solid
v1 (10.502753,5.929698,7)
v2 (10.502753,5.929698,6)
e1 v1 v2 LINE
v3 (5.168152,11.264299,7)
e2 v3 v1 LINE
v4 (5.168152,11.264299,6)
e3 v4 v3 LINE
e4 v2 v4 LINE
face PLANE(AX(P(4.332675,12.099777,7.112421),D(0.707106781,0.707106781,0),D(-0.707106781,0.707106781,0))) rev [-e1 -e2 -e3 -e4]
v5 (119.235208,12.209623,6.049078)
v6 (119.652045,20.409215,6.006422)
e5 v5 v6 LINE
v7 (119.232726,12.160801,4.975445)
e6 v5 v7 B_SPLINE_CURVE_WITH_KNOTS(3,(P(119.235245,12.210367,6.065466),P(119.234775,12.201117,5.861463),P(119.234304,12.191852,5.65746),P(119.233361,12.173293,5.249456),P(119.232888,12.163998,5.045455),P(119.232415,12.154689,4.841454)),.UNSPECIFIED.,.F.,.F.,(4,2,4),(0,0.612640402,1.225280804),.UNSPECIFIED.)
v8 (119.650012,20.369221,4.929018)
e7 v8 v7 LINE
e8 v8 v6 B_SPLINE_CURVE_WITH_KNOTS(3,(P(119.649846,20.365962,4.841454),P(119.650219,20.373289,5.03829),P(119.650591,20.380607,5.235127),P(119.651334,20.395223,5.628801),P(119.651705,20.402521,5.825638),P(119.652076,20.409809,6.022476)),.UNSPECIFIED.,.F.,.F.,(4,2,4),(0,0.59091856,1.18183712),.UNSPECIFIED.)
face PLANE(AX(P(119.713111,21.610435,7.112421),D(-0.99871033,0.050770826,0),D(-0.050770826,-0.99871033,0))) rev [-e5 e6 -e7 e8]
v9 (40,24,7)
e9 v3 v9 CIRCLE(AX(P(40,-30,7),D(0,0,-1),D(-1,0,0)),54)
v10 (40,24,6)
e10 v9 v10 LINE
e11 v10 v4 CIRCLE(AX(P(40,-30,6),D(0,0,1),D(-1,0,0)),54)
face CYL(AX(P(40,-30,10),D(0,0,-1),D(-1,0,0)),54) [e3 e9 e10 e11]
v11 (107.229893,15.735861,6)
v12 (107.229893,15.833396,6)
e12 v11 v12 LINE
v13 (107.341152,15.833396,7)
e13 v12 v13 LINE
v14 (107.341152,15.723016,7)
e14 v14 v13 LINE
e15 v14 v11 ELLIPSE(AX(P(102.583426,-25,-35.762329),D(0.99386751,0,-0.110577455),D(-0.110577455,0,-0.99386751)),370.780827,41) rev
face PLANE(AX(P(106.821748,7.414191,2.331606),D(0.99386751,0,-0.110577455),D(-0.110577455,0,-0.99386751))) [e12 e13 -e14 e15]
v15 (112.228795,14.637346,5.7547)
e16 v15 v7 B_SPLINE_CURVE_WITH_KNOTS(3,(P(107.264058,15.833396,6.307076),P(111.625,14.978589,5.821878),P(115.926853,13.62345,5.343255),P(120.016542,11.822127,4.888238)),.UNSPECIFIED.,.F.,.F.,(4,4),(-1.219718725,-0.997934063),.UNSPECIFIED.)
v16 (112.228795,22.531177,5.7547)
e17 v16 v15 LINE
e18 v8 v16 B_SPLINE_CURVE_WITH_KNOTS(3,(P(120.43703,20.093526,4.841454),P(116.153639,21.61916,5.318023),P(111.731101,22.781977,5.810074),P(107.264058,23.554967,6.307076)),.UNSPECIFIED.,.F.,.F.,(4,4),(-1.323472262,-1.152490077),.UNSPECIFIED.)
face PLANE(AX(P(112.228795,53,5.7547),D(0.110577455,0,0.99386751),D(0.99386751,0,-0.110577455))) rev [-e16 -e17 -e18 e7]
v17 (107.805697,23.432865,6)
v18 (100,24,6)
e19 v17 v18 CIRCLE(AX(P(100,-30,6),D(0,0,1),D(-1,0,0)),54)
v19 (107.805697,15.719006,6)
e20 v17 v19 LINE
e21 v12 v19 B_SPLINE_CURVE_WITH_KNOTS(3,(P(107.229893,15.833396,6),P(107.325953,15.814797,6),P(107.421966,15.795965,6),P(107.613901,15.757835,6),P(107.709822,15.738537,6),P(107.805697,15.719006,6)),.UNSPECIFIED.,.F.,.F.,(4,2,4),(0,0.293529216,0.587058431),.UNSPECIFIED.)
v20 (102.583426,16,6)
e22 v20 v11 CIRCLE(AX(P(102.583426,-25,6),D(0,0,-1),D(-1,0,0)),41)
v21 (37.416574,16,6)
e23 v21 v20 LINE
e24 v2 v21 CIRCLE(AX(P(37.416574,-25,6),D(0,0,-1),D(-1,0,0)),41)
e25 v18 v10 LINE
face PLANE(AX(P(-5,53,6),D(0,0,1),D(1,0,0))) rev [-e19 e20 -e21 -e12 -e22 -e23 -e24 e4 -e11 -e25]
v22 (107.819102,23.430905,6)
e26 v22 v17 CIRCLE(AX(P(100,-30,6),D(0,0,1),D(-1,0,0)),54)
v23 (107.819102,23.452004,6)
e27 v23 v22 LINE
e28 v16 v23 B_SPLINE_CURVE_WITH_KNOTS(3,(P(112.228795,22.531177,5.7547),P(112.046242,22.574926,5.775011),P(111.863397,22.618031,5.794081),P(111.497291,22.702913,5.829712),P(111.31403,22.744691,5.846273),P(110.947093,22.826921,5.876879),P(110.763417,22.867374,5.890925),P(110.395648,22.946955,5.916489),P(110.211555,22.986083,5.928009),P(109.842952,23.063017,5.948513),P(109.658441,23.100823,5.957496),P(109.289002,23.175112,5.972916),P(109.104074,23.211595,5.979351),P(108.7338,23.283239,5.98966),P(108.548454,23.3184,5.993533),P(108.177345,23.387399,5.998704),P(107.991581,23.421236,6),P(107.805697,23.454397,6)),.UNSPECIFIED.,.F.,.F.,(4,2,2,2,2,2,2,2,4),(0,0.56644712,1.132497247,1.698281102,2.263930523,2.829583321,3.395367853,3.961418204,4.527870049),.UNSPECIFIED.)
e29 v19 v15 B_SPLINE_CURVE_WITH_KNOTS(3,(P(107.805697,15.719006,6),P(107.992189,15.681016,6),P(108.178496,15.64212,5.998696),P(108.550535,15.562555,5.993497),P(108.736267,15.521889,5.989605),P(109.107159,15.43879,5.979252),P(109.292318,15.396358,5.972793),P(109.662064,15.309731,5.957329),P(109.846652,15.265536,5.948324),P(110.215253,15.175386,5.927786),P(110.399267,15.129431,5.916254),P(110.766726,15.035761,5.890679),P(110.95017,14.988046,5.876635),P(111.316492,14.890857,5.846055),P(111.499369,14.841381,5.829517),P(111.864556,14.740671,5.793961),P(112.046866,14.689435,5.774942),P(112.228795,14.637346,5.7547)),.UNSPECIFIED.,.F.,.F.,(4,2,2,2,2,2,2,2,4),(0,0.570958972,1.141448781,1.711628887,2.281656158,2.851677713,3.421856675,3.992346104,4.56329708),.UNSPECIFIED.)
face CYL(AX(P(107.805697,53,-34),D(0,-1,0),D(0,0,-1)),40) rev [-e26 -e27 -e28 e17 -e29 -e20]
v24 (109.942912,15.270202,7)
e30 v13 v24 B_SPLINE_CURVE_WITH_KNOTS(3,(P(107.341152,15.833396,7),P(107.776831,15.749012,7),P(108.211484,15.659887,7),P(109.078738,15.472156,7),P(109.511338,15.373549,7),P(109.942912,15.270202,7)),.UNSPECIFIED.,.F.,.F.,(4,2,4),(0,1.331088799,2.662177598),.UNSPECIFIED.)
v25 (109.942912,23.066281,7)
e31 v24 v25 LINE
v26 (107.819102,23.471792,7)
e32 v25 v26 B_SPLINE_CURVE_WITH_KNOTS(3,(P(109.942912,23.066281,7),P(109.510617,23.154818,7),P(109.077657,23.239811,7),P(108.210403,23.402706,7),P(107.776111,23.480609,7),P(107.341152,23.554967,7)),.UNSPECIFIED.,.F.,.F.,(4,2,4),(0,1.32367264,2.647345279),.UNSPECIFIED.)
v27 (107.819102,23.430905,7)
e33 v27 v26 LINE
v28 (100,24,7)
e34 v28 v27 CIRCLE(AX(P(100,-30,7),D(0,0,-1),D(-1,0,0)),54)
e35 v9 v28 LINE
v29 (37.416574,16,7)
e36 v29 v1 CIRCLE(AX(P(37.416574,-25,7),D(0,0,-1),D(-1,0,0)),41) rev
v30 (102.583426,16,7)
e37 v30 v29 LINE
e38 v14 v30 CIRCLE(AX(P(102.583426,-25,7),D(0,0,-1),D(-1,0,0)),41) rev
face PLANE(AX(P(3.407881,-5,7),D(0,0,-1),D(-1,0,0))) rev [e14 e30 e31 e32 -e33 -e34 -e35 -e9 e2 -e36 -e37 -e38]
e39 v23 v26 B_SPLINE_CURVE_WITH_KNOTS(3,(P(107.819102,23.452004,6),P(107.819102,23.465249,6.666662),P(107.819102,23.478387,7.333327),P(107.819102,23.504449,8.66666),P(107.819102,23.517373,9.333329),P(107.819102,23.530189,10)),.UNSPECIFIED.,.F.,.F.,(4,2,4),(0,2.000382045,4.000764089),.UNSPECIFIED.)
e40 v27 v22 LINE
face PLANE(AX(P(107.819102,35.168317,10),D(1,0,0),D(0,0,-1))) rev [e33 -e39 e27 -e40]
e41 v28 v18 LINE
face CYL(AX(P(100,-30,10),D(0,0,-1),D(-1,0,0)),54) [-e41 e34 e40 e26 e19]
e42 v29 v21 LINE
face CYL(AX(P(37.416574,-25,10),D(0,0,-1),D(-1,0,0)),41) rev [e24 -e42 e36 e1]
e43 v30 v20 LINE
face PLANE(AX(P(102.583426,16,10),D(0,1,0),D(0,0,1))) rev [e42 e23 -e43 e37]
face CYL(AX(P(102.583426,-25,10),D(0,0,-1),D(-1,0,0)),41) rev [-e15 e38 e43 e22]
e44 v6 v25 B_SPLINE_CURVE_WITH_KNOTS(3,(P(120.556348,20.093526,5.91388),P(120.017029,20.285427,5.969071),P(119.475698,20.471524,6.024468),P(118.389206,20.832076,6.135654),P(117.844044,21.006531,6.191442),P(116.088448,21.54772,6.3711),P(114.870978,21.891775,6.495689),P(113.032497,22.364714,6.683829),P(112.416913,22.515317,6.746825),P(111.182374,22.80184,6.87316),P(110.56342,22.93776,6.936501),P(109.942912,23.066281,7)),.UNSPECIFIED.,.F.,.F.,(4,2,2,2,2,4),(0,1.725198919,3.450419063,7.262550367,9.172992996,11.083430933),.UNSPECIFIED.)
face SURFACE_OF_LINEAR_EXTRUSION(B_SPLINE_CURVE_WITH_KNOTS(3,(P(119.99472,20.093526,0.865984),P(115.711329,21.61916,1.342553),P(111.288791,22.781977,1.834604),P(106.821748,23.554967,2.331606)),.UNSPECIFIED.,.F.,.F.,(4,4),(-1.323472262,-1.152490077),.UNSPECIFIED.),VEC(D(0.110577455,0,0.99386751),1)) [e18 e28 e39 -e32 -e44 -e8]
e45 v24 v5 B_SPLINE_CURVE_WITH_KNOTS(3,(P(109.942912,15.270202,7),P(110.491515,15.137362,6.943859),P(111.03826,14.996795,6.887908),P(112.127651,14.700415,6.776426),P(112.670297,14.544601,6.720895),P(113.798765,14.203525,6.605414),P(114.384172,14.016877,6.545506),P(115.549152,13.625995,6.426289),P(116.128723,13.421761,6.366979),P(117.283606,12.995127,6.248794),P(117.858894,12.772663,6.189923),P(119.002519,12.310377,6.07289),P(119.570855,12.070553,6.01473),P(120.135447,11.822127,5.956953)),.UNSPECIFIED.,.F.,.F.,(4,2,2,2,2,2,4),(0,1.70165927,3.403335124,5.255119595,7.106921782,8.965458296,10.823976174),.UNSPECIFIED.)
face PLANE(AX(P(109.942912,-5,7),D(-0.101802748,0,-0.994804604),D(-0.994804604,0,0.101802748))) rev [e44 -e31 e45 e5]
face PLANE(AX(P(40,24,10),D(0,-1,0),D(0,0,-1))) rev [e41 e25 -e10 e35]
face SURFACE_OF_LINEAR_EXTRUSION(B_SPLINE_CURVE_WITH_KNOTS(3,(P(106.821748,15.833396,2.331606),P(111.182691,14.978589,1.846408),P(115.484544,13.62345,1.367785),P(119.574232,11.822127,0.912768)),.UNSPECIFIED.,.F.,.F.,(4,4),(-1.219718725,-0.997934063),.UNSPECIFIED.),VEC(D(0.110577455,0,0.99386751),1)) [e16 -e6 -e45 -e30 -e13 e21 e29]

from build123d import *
from OCP.BRepAlgoAPI import BRepAlgoAPI_Cut
from OCP.TopTools import TopTools_ListOfShape

# Parameters (mm, degrees)
SKETCH10_R              = 1.5
BOSS_EXTRUDE2_DEPTH     = 18
CUT_EXTRUDE1_DEPTH      = 53
CUT_EXTRUDE1_DEPTH_BACK = 21
SKETCH12_R              = 101.363268326
CUT_EXTRUDE2_DEPTH      = 4
CUT_EXTRUDE3_DEPTH      = 4
CUT_EXTRUDE3_DEPTH_BACK = 4
CUT_EXTRUDE4_DEPTH      = 149.963082804
CUT_EXTRUDE4_DEPTH_BACK = 149.963082804
CUT_EXTRUDE5_DEPTH      = 123.927520285
CUT_EXTRUDE5_DEPTH_BACK = 123.927520285


with BuildPart() as part:
    # Sketch10 → Boss-Extrude2 (new body)
    with BuildSketch(Plane.XY):
        with BuildLine():
            Line((37.416573868, 15), (102.583426132, 15))
            ThreePointArc((102.583426132, 15), (121.439606964, 10.276684148), (135.842602904, -2.777777778))
            ThreePointArc((135.842602904, -2.777777778), (142.889960635, -4.080211701), (144, 3))
            ThreePointArc((144, 3), (124.596747752, 19.193495505), (100, 25))
            Line((100, 25), (40, 25))
            ThreePointArc((40, 25), (15.403252248, 19.193495505), (-4, 3))
            ThreePointArc((-4, 3), (-2.889960635, -4.080211701), (4.157397096, -2.777777778))
            ThreePointArc((4.157397096, -2.777777778), (18.560393036, 10.276684148), (37.416573868, 15))
        make_face()
        Circle(SKETCH10_R, mode=Mode.SUBTRACT)
        with Locations((140, 0)):
            Circle(SKETCH10_R, mode=Mode.SUBTRACT)
    extrude(amount=BOSS_EXTRUDE2_DEPTH)

    # Sketch12 → Cut-Extrude1 (cut, two sides: drawn at the far end of the back side and taken through both)
    with BuildSketch(Plane(origin=(0, 0, 0), x_dir=(1, 0, 0), z_dir=(0, 1, 0)).offset(-CUT_EXTRUDE1_DEPTH_BACK)):
        with Locations((76.008049748, -10.931288324)):
            Circle(SKETCH12_R)
        with BuildLine():
            Line((-5, -6), (-5, -14))
            Line((-5, -14), (107.805696866, -14))
            ThreePointArc((107.805696866, -14), (113.026744555, -14.342205545), (118.15845867, -15.362966948))
            Line((118.15845867, -15.362966948), (122.913338099, -16.637033052))
            ThreePointArc((122.913338099, -16.637033052), (128.045052215, -17.657794455), (133.266099903, -18))
            Line((133.266099903, -18), (145, -18))
            Line((145, -18), (145, -14))
            Line((145, -14), (130, -14))
            Line((130, -14), (126.989127027, -13.193239018))
            ThreePointArc((126.989127027, -13.193239018), (125.143296129, -10.589859532), (127.359731004, -8.293755679))
            Line((127.359731004, -8.293755679), (130, -8))
            Line((130, -8), (145, -8))
            Line((145, -8), (145, -4))
            Line((145, -4), (130.2183511, -4))
            ThreePointArc((130.2183511, -4), (128.003403615, -4.061371986), (125.795252917, -4.245299618))
            Line((125.795252917, -4.245299618), (112.228795048, -5.754700382))
            ThreePointArc((112.228795048, -5.754700382), (110.02064435, -5.938628014), (107.805696866, -6))
            Line((107.805696866, -6), (-5, -6))
        make_face(mode=Mode.SUBTRACT)
    extrude(amount=CUT_EXTRUDE1_DEPTH + CUT_EXTRUDE1_DEPTH_BACK, mode=Mode.SUBTRACT)


with BuildPart() as cut_extrude2_tool:
    # Sketch14 → Cut-Extrude2 (new body)
    with BuildSketch(Plane(origin=(0, 0, 6), x_dir=(-1, 0, 0), z_dir=(0, 0, -1))):
        with BuildLine():
            Line((-102.583426132, 16), (-37.416573868, 16))
            ThreePointArc((-37.416573868, 16), (-22.580527687, 13.221613437), (-9.75522645, 5.2630114))
            Line((-9.75522645, 5.2630114), (-4.407881121, 10.610356729))
            ThreePointArc((-4.407881121, 10.610356729), (-20.986311028, 20.541860192), (-40, 24))
            Line((-40, 24), (-100, 24))
            ThreePointArc((-100, 24), (-103.919892318, 23.857538416), (-107.819101893, 23.430905341))
            Line((-107.819101893, 23.430905341), (-107.819101893, 35.168317198))
            Line((-107.819101893, 35.168317198), (17.162371348, 35.168317198))
            Line((17.162371348, 35.168317198), (17.162371348, -18.766284645))
            Line((17.162371348, -18.766284645), (-107.819101893, -18.766284645))
            Line((-107.819101893, -18.766284645), (-107.819101893, 15.664329569))
            ThreePointArc((-107.819101893, 15.664329569), (-105.206638634, 15.915996336), (-102.583426132, 16))
        make_face()
    extrude(amount=-CUT_EXTRUDE2_DEPTH)


with BuildPart() as part_1:
    add(part.part)

    # Cut-Extrude2: cut by cut_extrude2_tool, with a tolerance
    cut_extrude2_stock = TopTools_ListOfShape()
    cut_extrude2_stock.Append(part_1.part.wrapped)
    cut_extrude2_tools = TopTools_ListOfShape()
    cut_extrude2_tools.Append(cut_extrude2_tool.part.wrapped)
    cut_extrude2_cut = BRepAlgoAPI_Cut()
    cut_extrude2_cut.SetArguments(cut_extrude2_stock)
    cut_extrude2_cut.SetTools(cut_extrude2_tools)
    cut_extrude2_cut.SetFuzzyValue(0.00001)
    cut_extrude2_cut.Build()
    add(Compound.cast(cut_extrude2_cut.Shape()).solids(), mode=Mode.REPLACE)

    # Sketch15 → Cut-Extrude3 (cut, two sides: drawn at the far end of the back side and taken through both)
    with BuildSketch(Plane(origin=(2.00470116, 0, 18.018205945), x_dir=(-0.9938675095528059, 0, 0.11057745455246941), z_dir=(-0.11057745455246942, 0, -0.993867509552806)).offset(-CUT_EXTRUDE3_DEPTH_BACK)):
        with BuildLine():
            Line((-119.163095282, 20.093526394), (-118.740012656, 11.822126877))
            add(Edge.make_bspline(
                [(-118.740012656, 11.822126877), (-114.62508956, 13.623450352), (-110.296692622, 14.978589212), (-105.908841603, 15.833395956)],
                knots=[-1.219718725, -1.219718725, -1.219718725, -1.219718725, -0.997934063, -0.997934063, -0.997934063, -0.997934063], degree=3))
            Line((-105.908841603, 15.833395956), (-105.908841603, 7.414190779))
            Line((-105.908841603, 7.414190779), (-142.752233985, -17.524399772))
            Line((-142.752233985, -17.524399772), (-150.166718445, 16.856471942))
            Line((-150.166718445, 16.856471942), (-106.447848094, 34.09271449))
            Line((-106.447848094, 34.09271449), (-105.908841603, 23.554966644))
            add(Edge.make_bspline(
                [(-105.908841603, 23.554966644), (-110.40344818, 22.781977164), (-114.85327417, 21.619160072), (-119.163095282, 20.093526394)],
                knots=[-1.323472262, -1.323472262, -1.323472262, -1.323472262, -1.152490077, -1.152490077, -1.152490077, -1.152490077], degree=3))
        make_face()
    extrude(amount=CUT_EXTRUDE3_DEPTH + CUT_EXTRUDE3_DEPTH_BACK, mode=Mode.SUBTRACT)

    # Sketch16 → Cut-Extrude4 (cut, two sides: drawn at the far end of the back side and taken through both)
    with BuildSketch(Plane(origin=(0, 24, 0), x_dir=(1, 0, 0), z_dir=(0, 1, 0)).offset(-CUT_EXTRUDE4_DEPTH_BACK)):
        Polygon((3.407881121, -7), (109.942912406, -7), (121.047014556, -5.863668195), (121.047014556, -0.454097239), (147.279060568, 4.078614092), (150.076867714, -41.016929059), (122.104873778, -29.787827075), (117.671018844, -29.787827075), (117.671018844, -30.883133113), (3.407881121, -30.883133113), (-7.729647631, -28.692521036), (-16.239396681, -3.124111032), (3.407881121, -0.69185953), align=None)
    extrude(amount=CUT_EXTRUDE4_DEPTH + CUT_EXTRUDE4_DEPTH_BACK, mode=Mode.SUBTRACT)

    # Sketch17 → Cut-Extrude5 (cut, two sides: drawn at the far end of the back side and taken through both)
    with BuildSketch(Plane(origin=(0, 0, 6), x_dir=(-1, 0, 0), z_dir=(0, 0, -1)).offset(-CUT_EXTRUDE5_DEPTH_BACK)):
        Polygon((-4.33267462, 12.099776793), (-11.665353096, 4.767098316), (-11.583019887, 4.684765107), (-10.593616865, 3.695362084), (-1.134184227, 10.251312954), align=None)
        Polygon((-119.713110979, 21.610434881), (-119.111195403, 9.770184261), (-121.889059026, 7.660492949), (-122.569179785, 21.039113751), align=None)
    extrude(amount=CUT_EXTRUDE5_DEPTH + CUT_EXTRUDE5_DEPTH_BACK, mode=Mode.SUBTRACT)


solid = part_1.part
